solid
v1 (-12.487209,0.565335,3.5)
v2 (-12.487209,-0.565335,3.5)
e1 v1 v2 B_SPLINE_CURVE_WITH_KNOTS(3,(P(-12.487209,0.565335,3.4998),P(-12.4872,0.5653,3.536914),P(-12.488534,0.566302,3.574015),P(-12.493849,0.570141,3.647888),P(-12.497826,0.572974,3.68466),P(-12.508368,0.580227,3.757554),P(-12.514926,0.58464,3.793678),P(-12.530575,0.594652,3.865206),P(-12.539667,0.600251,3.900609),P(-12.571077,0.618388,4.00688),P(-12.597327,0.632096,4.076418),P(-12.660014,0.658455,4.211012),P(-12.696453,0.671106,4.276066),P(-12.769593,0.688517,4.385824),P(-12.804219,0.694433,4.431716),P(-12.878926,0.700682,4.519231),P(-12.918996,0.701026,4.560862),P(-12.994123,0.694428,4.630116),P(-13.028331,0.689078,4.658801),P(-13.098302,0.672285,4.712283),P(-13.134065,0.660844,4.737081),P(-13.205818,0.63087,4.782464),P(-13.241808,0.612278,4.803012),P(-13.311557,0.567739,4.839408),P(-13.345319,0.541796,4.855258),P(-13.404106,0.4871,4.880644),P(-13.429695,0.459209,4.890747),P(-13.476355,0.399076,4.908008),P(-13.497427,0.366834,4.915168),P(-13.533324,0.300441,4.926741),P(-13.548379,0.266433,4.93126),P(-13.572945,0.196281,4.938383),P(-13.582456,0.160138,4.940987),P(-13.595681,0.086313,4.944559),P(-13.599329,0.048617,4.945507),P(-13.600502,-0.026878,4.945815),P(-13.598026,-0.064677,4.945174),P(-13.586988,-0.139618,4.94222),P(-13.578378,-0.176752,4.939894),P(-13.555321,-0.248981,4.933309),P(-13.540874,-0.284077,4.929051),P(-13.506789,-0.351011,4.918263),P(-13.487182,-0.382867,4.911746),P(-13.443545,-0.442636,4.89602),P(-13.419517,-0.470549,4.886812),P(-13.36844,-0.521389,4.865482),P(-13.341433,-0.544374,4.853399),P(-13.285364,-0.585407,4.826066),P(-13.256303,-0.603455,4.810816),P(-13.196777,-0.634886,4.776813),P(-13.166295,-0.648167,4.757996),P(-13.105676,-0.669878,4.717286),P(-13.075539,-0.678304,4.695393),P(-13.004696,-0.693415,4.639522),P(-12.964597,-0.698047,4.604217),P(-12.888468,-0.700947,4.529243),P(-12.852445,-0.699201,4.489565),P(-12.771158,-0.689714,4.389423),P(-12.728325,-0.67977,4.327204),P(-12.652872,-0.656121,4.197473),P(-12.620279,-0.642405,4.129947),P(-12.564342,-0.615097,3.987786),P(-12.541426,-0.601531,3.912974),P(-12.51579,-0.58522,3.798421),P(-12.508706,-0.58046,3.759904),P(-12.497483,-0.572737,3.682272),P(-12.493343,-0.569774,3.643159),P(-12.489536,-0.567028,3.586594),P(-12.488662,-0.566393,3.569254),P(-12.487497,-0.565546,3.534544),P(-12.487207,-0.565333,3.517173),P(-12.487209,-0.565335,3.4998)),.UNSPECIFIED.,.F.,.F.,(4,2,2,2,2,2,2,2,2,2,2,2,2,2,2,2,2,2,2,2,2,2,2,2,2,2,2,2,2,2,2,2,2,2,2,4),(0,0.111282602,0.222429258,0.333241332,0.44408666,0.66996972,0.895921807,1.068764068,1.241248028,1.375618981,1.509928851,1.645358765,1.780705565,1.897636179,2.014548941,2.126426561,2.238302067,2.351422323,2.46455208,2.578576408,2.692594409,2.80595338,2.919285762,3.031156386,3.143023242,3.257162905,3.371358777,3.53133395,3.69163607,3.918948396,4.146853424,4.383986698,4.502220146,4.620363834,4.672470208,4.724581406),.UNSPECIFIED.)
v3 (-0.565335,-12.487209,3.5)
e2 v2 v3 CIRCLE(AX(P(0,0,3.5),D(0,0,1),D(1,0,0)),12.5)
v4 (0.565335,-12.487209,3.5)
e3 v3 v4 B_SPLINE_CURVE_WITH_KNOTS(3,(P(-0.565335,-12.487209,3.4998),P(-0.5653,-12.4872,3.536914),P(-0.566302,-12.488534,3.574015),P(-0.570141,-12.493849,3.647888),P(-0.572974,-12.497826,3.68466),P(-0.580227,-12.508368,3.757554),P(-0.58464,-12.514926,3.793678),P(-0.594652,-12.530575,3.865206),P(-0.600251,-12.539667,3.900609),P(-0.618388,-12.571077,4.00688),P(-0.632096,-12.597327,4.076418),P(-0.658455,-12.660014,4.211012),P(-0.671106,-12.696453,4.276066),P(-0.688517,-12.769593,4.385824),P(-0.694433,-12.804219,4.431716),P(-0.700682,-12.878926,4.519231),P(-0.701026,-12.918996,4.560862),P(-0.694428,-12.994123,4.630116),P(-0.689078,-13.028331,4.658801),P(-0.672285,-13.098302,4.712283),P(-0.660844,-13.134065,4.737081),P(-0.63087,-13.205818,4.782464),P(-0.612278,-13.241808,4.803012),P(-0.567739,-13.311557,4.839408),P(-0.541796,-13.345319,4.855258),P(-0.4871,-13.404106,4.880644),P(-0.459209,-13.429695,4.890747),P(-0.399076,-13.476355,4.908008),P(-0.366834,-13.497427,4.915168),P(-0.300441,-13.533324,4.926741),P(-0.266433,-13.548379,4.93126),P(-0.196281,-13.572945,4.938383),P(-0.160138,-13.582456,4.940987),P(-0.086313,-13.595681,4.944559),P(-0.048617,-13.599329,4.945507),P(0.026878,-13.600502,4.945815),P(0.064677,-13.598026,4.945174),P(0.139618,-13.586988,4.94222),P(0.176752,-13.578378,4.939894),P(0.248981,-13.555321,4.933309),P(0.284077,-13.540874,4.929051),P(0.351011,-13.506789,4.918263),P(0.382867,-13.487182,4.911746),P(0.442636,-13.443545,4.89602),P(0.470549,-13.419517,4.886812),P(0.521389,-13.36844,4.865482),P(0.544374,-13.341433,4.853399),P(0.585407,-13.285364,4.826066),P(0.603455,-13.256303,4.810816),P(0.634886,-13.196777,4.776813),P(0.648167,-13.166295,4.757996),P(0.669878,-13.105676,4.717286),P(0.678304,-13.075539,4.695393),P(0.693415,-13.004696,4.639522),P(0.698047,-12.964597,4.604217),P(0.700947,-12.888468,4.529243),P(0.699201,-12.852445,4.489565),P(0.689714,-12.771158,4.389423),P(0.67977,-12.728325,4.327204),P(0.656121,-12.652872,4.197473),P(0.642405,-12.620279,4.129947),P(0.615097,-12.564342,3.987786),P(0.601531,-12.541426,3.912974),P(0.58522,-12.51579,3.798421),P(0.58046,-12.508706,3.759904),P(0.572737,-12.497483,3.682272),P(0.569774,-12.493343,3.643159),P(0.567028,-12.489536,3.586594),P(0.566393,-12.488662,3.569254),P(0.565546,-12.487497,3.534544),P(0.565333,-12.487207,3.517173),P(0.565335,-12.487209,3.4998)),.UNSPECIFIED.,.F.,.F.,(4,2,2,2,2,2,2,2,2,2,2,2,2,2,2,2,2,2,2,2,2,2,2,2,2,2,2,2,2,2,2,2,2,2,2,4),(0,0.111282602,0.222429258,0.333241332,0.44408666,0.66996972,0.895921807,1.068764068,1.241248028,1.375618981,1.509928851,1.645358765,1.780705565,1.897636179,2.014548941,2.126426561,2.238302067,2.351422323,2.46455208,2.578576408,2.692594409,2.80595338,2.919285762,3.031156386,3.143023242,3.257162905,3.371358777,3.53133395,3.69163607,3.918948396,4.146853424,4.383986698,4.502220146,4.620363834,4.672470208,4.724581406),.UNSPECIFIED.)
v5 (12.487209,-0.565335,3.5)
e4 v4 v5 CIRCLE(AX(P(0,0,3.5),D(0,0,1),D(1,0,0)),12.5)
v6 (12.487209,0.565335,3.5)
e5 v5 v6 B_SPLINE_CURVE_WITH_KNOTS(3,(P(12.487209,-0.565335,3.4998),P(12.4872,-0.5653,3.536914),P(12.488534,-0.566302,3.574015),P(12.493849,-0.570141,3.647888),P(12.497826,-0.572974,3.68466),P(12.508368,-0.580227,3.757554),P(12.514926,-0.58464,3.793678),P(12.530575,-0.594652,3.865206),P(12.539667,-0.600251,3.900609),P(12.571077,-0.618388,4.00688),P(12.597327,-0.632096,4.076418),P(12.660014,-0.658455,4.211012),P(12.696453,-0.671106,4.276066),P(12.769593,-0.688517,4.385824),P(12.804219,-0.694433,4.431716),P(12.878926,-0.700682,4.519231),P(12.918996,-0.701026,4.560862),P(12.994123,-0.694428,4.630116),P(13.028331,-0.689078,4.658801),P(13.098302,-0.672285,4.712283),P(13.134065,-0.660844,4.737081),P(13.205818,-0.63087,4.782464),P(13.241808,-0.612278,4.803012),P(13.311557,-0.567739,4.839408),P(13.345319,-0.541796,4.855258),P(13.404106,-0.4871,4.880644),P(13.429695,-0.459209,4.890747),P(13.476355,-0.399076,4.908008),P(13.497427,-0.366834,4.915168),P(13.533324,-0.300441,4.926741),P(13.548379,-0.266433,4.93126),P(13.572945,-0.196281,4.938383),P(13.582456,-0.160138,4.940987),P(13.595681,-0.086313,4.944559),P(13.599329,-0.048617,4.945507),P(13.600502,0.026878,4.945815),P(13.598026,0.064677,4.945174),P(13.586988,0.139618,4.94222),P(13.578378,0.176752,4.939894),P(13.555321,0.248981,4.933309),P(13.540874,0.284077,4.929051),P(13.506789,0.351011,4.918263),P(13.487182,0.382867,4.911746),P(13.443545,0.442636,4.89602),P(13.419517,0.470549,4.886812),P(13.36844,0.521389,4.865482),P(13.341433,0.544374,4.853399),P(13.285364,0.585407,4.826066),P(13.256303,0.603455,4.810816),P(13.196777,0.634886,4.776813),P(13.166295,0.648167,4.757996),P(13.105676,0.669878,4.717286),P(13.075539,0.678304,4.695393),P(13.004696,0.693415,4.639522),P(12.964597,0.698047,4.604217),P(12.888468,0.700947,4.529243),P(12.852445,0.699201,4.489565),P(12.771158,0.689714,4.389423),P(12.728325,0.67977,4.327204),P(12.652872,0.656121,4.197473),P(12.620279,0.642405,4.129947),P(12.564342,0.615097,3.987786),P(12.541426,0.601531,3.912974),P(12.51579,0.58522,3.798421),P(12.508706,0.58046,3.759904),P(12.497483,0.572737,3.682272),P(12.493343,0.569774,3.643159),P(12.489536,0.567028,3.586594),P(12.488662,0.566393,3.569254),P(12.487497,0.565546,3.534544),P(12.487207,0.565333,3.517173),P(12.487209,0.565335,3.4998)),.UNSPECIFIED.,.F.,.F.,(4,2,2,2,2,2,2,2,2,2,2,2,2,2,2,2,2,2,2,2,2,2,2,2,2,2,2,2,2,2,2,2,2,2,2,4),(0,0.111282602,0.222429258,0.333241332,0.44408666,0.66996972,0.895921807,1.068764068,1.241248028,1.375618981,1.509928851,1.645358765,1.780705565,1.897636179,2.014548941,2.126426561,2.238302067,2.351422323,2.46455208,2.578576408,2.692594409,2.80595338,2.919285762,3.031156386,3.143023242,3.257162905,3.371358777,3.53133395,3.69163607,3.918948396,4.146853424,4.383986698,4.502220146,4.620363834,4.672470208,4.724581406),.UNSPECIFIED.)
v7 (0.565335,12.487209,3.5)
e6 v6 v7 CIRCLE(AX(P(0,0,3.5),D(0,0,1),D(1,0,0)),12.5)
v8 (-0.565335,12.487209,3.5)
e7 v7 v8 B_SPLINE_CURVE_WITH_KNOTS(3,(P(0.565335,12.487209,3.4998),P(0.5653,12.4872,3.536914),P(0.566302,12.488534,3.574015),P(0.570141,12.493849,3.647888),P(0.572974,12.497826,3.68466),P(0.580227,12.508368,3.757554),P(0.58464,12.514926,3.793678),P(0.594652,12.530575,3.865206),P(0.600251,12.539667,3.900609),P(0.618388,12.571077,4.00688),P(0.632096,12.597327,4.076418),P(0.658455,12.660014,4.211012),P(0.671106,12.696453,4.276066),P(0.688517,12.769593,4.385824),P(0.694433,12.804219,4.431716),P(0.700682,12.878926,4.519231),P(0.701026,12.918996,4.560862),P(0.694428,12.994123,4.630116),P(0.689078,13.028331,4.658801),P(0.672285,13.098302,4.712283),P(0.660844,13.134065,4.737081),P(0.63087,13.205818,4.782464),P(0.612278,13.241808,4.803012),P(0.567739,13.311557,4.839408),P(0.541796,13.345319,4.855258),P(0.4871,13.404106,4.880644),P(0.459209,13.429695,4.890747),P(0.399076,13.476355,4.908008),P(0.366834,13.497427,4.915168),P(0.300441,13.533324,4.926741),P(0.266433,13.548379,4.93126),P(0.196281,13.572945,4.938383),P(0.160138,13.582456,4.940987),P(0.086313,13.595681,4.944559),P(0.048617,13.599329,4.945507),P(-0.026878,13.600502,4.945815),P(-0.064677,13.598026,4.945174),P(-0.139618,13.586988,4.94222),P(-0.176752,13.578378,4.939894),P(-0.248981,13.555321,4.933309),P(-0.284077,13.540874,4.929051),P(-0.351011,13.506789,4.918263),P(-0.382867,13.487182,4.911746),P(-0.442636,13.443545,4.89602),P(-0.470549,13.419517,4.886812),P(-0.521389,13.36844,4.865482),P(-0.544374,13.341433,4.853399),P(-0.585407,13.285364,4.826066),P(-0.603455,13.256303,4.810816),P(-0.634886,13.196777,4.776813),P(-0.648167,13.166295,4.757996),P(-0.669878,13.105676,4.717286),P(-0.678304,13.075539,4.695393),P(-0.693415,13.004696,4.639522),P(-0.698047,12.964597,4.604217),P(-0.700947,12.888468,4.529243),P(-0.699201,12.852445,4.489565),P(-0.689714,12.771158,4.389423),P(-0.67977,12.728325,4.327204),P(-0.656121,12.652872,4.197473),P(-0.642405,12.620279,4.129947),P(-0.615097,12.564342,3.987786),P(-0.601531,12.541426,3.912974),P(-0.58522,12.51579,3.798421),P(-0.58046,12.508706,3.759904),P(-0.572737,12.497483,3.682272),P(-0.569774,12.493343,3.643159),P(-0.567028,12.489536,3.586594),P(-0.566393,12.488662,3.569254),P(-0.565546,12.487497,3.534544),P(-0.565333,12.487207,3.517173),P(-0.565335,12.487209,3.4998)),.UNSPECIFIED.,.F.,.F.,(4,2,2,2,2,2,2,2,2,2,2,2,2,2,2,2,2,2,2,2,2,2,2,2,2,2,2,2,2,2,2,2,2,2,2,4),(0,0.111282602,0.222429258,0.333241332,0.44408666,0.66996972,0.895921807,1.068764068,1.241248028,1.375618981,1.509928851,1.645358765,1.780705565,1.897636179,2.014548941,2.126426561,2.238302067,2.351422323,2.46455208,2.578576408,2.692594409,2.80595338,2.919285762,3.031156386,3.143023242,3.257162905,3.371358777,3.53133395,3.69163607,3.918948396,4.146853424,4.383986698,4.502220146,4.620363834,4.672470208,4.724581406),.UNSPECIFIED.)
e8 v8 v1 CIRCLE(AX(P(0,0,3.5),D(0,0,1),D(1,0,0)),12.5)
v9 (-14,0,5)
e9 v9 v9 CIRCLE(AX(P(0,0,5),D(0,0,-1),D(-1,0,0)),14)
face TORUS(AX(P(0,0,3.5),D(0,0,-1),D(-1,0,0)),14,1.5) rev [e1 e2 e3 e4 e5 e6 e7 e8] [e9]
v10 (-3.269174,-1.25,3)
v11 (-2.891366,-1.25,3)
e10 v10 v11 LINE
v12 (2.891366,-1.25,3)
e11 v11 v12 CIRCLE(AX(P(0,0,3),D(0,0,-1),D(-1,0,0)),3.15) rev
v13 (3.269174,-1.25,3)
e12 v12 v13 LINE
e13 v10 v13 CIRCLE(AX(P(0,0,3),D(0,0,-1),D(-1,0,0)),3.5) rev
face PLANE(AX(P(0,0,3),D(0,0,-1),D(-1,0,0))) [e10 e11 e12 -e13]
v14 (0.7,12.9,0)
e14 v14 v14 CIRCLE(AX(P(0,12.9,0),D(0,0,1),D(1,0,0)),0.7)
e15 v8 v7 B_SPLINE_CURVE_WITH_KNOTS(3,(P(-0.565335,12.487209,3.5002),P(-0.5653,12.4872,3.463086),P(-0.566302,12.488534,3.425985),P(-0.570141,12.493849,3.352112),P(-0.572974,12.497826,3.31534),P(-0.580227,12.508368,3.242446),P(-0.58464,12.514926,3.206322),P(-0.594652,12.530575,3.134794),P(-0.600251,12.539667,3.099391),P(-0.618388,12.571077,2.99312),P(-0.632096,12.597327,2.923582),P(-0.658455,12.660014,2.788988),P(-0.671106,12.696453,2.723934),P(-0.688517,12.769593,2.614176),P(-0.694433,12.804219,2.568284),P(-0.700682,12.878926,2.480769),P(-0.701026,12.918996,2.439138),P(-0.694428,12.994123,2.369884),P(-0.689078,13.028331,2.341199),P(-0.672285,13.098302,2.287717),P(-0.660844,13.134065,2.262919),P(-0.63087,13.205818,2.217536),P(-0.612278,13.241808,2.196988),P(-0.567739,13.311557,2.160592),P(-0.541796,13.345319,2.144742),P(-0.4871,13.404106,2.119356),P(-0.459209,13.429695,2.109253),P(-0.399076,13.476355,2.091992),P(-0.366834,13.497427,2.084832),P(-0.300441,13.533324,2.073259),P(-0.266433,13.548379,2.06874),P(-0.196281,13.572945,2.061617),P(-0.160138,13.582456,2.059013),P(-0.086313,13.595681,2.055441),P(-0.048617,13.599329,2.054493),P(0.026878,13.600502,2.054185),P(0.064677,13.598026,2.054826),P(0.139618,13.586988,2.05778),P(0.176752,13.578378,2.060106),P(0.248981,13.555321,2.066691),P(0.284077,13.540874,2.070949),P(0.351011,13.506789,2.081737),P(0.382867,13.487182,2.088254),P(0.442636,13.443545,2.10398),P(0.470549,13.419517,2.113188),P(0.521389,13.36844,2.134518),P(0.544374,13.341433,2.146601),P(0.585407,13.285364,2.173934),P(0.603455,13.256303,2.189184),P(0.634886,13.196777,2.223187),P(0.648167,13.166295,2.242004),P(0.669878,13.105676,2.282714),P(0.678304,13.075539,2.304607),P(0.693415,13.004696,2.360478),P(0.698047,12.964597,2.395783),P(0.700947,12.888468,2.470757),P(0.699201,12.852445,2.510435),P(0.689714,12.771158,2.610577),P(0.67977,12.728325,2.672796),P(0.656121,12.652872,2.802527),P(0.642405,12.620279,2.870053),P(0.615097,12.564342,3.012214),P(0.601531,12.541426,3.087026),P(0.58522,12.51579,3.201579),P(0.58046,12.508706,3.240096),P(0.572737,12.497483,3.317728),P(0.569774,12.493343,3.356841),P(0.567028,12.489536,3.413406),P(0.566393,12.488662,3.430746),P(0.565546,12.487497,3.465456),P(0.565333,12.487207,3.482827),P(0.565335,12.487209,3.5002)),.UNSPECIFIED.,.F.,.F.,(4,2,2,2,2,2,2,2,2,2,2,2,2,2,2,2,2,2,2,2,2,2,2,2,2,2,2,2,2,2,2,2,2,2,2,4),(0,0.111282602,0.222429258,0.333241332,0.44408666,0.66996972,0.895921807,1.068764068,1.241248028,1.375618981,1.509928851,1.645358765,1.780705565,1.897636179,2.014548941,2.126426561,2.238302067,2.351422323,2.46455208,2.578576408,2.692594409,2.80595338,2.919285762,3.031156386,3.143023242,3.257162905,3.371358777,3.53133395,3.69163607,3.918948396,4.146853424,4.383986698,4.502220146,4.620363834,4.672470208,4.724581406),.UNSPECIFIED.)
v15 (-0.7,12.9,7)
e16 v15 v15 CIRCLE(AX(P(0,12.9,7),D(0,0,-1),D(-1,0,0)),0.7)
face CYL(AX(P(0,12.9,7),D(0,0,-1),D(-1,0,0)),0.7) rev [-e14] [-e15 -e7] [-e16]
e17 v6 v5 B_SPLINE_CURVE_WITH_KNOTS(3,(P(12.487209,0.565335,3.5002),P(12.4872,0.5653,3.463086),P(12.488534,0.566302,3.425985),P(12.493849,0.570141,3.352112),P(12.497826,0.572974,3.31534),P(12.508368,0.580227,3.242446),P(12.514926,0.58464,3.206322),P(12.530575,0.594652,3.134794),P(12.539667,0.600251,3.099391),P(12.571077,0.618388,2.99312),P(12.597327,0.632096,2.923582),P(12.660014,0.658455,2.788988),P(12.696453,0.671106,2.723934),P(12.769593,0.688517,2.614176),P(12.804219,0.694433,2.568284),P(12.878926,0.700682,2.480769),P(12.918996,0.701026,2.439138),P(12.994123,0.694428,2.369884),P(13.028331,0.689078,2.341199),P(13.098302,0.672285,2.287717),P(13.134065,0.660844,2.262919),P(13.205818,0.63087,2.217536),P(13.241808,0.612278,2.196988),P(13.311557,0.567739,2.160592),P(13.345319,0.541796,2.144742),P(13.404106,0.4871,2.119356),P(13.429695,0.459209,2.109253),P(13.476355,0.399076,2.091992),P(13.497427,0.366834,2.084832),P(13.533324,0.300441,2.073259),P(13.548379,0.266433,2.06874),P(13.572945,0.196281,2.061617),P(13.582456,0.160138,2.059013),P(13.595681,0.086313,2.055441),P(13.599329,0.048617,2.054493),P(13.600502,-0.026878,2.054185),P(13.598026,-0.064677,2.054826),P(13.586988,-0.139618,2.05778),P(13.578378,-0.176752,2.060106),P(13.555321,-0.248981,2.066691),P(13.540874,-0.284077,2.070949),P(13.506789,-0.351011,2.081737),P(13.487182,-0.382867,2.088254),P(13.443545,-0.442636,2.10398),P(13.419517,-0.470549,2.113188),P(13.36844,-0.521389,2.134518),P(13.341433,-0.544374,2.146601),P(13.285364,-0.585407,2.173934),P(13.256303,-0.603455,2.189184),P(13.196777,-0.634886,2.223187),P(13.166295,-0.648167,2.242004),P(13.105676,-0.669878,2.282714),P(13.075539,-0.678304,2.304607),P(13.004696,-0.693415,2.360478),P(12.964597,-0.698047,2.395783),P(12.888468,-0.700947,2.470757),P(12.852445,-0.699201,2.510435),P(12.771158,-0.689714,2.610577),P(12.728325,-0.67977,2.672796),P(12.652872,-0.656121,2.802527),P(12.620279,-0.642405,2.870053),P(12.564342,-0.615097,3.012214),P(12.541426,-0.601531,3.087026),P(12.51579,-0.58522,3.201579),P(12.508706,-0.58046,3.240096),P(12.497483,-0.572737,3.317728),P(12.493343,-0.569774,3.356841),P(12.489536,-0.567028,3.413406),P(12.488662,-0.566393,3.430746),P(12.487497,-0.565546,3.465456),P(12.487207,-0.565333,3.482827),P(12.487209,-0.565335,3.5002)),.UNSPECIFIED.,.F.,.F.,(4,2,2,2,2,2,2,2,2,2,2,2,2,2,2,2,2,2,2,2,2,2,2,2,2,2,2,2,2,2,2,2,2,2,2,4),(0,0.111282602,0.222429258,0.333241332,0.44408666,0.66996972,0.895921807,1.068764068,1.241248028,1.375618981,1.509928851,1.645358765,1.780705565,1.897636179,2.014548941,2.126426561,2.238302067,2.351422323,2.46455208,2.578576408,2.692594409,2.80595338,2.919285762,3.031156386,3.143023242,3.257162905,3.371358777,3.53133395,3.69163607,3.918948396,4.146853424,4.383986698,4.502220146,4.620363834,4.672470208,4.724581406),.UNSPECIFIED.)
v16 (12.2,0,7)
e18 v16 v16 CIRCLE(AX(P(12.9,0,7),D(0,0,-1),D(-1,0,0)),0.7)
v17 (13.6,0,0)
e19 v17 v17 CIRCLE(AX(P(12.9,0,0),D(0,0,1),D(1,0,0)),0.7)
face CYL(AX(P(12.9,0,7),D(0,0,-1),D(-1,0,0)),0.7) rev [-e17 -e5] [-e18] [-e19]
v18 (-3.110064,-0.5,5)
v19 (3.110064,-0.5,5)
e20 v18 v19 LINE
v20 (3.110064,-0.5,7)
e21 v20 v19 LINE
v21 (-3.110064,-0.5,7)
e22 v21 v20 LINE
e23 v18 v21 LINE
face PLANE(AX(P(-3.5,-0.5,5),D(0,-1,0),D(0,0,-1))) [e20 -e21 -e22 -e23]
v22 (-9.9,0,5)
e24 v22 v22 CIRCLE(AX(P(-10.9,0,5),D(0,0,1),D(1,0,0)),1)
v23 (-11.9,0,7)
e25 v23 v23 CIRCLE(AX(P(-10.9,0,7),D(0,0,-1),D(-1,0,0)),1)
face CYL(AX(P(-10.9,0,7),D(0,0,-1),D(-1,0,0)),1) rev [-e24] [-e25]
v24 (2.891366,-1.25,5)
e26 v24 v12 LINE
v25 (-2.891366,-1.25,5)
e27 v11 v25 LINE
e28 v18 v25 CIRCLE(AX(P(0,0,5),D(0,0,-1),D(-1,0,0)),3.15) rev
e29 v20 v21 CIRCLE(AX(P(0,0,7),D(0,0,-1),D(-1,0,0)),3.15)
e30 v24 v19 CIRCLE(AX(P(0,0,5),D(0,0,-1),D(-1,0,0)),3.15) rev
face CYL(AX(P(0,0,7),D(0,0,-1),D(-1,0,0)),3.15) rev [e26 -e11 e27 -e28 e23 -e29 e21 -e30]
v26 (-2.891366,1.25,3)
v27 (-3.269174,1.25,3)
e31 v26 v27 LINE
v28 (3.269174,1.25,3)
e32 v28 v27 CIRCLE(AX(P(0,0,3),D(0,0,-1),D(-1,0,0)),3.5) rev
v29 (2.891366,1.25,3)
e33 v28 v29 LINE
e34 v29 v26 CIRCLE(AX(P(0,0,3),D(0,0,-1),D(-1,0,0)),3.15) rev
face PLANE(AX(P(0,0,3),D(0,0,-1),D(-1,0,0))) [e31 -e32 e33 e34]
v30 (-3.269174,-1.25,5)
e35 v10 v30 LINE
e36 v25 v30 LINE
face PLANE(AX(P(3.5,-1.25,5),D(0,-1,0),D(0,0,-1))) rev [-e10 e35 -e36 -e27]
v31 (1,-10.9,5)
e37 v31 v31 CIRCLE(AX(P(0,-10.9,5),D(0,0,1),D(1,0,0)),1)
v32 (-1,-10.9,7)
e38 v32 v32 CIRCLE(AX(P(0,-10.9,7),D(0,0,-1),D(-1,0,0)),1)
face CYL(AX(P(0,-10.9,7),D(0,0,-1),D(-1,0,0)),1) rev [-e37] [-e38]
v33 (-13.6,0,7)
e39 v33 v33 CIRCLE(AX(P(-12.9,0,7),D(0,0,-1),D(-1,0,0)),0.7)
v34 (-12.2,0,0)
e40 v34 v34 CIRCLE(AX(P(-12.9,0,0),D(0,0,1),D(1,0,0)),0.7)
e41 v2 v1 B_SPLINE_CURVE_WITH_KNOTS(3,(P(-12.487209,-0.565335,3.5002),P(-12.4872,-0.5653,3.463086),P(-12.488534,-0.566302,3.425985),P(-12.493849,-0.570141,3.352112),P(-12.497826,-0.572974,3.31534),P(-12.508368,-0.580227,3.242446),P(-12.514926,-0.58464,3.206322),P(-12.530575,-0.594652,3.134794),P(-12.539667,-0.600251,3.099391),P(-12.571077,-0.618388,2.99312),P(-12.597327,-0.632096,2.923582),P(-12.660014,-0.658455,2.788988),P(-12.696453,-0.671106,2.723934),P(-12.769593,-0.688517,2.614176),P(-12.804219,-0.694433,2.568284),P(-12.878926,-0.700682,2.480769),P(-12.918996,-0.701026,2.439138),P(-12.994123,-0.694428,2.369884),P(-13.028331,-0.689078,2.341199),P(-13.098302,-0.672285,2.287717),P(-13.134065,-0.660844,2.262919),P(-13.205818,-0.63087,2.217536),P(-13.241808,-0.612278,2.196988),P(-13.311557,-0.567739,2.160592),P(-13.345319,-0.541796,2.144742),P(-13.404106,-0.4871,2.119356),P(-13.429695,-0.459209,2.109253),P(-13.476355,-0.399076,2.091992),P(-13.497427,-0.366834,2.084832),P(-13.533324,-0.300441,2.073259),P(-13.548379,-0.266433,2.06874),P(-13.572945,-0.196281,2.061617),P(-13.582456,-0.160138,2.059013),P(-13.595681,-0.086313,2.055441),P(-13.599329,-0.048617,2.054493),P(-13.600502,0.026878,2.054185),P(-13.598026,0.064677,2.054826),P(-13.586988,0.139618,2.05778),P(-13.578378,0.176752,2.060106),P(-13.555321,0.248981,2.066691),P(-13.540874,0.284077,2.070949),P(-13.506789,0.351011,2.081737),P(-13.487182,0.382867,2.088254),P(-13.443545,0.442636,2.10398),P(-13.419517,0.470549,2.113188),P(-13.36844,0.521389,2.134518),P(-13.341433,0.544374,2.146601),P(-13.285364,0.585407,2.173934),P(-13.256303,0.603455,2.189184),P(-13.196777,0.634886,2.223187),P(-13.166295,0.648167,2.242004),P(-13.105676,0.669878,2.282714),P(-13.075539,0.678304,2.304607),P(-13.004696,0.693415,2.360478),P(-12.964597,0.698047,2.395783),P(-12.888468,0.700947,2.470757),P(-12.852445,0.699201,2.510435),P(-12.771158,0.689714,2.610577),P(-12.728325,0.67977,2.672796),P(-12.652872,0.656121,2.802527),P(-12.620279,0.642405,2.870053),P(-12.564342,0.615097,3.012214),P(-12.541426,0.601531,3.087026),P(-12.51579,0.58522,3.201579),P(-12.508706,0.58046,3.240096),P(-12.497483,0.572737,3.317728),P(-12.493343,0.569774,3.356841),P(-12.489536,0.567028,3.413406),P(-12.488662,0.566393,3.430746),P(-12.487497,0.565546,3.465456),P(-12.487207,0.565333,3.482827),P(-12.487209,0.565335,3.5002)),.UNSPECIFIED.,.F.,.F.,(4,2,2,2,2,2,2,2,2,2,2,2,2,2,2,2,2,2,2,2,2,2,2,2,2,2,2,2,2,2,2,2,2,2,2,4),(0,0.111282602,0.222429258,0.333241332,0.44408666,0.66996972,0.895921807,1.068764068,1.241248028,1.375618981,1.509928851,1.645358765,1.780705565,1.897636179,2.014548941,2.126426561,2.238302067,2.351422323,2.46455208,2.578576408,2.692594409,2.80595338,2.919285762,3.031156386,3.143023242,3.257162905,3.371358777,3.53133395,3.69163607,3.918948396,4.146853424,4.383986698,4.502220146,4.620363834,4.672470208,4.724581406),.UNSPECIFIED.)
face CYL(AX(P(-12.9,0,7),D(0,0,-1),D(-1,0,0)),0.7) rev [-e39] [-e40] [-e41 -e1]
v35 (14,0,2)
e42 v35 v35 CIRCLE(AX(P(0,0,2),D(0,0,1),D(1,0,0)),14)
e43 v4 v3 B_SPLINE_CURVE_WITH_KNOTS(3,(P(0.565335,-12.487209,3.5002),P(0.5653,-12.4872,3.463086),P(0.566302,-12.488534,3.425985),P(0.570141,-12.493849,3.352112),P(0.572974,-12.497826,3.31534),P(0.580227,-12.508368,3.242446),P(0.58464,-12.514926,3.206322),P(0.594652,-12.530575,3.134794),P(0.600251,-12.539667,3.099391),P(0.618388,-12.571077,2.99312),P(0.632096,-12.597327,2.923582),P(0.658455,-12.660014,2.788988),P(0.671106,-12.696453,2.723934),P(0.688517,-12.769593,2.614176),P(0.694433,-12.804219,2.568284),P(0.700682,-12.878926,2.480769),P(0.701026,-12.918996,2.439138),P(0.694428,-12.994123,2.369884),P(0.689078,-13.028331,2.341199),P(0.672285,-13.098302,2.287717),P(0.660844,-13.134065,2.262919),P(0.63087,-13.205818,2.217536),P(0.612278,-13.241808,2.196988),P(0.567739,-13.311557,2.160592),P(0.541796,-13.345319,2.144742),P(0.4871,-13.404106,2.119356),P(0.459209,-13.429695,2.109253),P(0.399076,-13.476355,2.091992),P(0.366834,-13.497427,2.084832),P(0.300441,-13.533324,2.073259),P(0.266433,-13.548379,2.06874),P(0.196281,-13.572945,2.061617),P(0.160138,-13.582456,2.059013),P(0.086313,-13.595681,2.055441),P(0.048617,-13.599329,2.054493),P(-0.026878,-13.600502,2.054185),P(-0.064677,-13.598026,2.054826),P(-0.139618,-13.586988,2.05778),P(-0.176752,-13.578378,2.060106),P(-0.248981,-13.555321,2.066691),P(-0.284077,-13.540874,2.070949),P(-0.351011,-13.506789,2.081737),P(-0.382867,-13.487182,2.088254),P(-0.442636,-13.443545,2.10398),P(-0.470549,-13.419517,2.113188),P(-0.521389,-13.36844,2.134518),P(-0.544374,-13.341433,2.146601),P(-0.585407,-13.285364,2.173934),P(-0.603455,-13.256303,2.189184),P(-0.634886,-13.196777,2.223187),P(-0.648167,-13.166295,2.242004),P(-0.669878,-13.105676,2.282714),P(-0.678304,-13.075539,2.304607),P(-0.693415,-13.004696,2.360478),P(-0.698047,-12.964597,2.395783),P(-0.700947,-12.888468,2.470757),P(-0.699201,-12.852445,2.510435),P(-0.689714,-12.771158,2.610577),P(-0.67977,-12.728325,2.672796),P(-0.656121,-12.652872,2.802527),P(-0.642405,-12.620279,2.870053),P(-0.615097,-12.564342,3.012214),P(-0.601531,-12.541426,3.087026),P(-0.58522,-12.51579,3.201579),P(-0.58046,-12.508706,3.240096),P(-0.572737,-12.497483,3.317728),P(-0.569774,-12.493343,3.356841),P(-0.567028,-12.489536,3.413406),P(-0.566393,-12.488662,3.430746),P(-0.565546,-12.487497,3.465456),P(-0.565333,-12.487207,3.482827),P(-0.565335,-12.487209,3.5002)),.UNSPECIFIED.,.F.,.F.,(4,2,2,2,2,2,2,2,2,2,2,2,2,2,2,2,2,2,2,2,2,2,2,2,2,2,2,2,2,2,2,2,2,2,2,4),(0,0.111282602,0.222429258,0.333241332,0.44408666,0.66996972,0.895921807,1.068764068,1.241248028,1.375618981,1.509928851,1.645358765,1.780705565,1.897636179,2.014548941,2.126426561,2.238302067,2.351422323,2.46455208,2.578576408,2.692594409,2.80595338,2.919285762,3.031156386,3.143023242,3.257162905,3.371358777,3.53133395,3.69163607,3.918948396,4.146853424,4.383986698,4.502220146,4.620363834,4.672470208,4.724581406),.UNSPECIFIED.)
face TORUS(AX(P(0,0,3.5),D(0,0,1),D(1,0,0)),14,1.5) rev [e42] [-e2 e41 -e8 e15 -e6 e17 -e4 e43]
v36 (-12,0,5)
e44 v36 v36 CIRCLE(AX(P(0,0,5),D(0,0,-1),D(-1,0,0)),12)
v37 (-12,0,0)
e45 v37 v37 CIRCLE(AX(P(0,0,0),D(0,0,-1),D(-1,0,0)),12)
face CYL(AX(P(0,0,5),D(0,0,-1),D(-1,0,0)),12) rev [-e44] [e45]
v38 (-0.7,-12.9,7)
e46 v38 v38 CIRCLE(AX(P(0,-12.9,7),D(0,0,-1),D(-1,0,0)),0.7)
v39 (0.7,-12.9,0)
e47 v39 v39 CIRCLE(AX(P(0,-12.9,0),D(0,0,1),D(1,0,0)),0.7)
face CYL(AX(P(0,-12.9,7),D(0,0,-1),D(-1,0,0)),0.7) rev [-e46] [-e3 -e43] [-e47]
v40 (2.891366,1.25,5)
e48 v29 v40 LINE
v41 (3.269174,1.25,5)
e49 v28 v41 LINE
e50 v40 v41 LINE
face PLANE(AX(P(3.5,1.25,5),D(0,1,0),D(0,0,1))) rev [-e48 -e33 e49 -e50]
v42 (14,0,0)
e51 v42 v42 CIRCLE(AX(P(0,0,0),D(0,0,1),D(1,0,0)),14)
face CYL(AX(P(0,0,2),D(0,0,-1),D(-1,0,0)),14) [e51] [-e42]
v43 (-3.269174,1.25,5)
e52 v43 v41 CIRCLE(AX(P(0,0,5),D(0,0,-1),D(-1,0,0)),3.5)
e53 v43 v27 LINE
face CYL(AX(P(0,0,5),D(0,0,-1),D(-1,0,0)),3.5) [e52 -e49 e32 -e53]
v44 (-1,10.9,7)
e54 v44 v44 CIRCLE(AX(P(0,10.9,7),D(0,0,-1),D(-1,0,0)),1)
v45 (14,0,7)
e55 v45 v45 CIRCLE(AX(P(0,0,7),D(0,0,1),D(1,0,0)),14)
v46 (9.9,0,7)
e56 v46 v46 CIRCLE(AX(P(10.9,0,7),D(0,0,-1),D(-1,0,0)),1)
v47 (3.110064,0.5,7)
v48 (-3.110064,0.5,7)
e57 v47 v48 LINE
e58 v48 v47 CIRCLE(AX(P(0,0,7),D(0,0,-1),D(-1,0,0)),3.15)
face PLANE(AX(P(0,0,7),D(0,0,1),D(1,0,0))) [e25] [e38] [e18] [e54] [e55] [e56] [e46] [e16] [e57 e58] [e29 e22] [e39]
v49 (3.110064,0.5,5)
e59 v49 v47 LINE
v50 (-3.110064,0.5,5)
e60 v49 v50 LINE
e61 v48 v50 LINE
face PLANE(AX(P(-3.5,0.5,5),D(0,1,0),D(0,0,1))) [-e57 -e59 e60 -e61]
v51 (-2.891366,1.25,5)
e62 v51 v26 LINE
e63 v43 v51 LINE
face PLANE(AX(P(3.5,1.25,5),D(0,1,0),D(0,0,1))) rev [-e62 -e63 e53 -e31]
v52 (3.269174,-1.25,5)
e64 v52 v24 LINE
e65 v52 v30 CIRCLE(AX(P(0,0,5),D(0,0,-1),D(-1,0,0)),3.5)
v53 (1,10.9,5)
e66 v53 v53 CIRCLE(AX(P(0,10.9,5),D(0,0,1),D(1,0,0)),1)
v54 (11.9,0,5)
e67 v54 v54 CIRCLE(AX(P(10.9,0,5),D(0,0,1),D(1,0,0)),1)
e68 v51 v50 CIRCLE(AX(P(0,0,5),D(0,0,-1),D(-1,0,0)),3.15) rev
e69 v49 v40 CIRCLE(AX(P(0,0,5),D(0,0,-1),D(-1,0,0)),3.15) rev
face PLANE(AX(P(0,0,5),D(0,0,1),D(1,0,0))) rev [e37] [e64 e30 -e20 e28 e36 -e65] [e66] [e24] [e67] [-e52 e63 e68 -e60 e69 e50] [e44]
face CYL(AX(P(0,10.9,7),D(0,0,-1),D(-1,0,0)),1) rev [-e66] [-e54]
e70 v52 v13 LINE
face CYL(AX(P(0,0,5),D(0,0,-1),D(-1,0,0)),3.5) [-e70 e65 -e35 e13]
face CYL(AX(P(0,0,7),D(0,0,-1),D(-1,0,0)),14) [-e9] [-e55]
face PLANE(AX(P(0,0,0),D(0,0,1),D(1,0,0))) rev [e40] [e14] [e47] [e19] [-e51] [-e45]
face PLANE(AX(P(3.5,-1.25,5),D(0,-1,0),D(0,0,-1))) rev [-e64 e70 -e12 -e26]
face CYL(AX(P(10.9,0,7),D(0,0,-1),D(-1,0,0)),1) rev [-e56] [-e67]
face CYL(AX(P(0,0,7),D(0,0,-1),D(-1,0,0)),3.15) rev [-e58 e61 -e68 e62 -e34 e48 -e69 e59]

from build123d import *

# Parameters (mm, degrees)
SKETCH1_R               = 14
BOSS_EXTRUDE1_DEPTH     = 7
SKETCH3_R               = 3.15
CUT_EXTRUDE1_DEPTH      = 22
SKETCH4_W               = 7
SKETCH4_H               = 1
BOSS_EXTRUDE2_DEPTH     = 2
SKETCH5_R               = 12
SKETCH5_R_2             = 3.5
CUT_EXTRUDE2_DEPTH      = 5
SKETCH6_W               = 7
SKETCH6_H               = 2.5
CUT_EXTRUDE3_DEPTH      = 5
SKETCH7_R               = 14
SKETCH7_R_2             = 12.5
CUT_EXTRUDE4_DEPTH      = 5
SKETCH8_R               = 14
SKETCH8_R_2             = 12.5
BOSS_EXTRUDE3_DEPTH     = 2
FILLET1_R               = 1.5
CUT_EXTRUDE7_DEPTH      = 22
CUT_EXTRUDE7_DEPTH_BACK = 22
SKETCH9_R               = 1
SKETCH9_R_2             = 0.7
SKETCH10_W              = 6.874413596
SKETCH10_H              = 7.54594332
CUT_EXTRUDE8_DEPTH      = 3


with BuildPart() as part:
    # Sketch1 → Boss-Extrude1 (new body)
    with BuildSketch(Plane.XY):
        Circle(SKETCH1_R)
    extrude(amount=BOSS_EXTRUDE1_DEPTH)

    # Sketch3 → Cut-Extrude1 (cut, through all)
    with BuildSketch(Plane(origin=(0, 0, 0), x_dir=(-1, 0, 0), z_dir=(0, 0, -1))):
        Circle(SKETCH3_R)
    extrude(amount=-CUT_EXTRUDE1_DEPTH, mode=Mode.SUBTRACT)

    # Sketch4 → Boss-Extrude2 (add)
    with BuildSketch(Plane.XY.offset(7)):
        Rectangle(SKETCH4_W, SKETCH4_H)
    extrude(amount=-BOSS_EXTRUDE2_DEPTH)

    # Sketch5 → Cut-Extrude2 (cut)
    with BuildSketch(Plane(origin=(0, 0, 0), x_dir=(-1, 0, 0), z_dir=(0, 0, -1))):
        Circle(SKETCH5_R)
        Circle(SKETCH5_R_2, mode=Mode.SUBTRACT)
    extrude(amount=-CUT_EXTRUDE2_DEPTH, mode=Mode.SUBTRACT)

    # Sketch6 → Cut-Extrude3 (cut)
    with BuildSketch(Plane(origin=(0, 0, 0), x_dir=(-1, 0, 0), z_dir=(0, 0, -1))):
        Rectangle(SKETCH6_W, SKETCH6_H)
    extrude(amount=-CUT_EXTRUDE3_DEPTH, mode=Mode.SUBTRACT)

    # Sketch7 → Cut-Extrude4 (cut)
    with BuildSketch(Plane(origin=(0, 0, 0), x_dir=(-1, 0, 0), z_dir=(0, 0, -1))):
        Circle(SKETCH7_R)
        Circle(SKETCH7_R_2, mode=Mode.SUBTRACT)
    extrude(amount=-CUT_EXTRUDE4_DEPTH, mode=Mode.SUBTRACT)

    # Sketch8 → Boss-Extrude3 (add)
    with BuildSketch(Plane.XY):
        with Locations(Location((0, 0, 0), (0, 0, 180))):
            Circle(SKETCH8_R)
        with Locations(Location((0, 0, 0), (0, 0, 180))):
            Circle(SKETCH8_R_2, mode=Mode.SUBTRACT)
    extrude(amount=BOSS_EXTRUDE3_DEPTH)

    # Fillet1
    fillet1_edges = [part.edges().sort_by_distance(p)[0] for p in [
        (12.5, 0, 5),
        (12.5, 0, 2),
    ]]
    fillet(fillet1_edges, radius=FILLET1_R - 0.0001)  # a hair under: the kernel refuses the full size

    # Sketch9 → Cut-Extrude7 (cut, two sides: drawn at the far end of the back side and taken through both)
    with BuildSketch(Plane(origin=(0, 0, 0), x_dir=(-1, 0, 0), z_dir=(0, 0, -1)).offset(-CUT_EXTRUDE7_DEPTH_BACK)):
        with Locations((0, 10.9)):
            Circle(SKETCH9_R)
        with Locations((0, 12.9)):
            Circle(SKETCH9_R_2)
        with Locations((12.9, 0)):
            Circle(SKETCH9_R_2)
        with Locations((0, -12.9)):
            Circle(SKETCH9_R_2)
        with Locations((-12.9, 0)):
            Circle(SKETCH9_R_2)
        with Locations((-10.9, 0)):
            Circle(SKETCH9_R)
        with Locations((10.9, 0)):
            Circle(SKETCH9_R)
        with Locations((0, -10.9)):
            Circle(SKETCH9_R)
    extrude(amount=CUT_EXTRUDE7_DEPTH + CUT_EXTRUDE7_DEPTH_BACK, mode=Mode.SUBTRACT)

    # Sketch10 → Cut-Extrude8 (cut)
    with BuildSketch(Plane(origin=(0, 0, 0), x_dir=(-1, 0, 0), z_dir=(0, 0, -1))):
        with Locations((0.008465514, -0.14973146)):
            Rectangle(SKETCH10_W, SKETCH10_H)
    extrude(amount=-CUT_EXTRUDE8_DEPTH, mode=Mode.SUBTRACT)


solid = part.part
